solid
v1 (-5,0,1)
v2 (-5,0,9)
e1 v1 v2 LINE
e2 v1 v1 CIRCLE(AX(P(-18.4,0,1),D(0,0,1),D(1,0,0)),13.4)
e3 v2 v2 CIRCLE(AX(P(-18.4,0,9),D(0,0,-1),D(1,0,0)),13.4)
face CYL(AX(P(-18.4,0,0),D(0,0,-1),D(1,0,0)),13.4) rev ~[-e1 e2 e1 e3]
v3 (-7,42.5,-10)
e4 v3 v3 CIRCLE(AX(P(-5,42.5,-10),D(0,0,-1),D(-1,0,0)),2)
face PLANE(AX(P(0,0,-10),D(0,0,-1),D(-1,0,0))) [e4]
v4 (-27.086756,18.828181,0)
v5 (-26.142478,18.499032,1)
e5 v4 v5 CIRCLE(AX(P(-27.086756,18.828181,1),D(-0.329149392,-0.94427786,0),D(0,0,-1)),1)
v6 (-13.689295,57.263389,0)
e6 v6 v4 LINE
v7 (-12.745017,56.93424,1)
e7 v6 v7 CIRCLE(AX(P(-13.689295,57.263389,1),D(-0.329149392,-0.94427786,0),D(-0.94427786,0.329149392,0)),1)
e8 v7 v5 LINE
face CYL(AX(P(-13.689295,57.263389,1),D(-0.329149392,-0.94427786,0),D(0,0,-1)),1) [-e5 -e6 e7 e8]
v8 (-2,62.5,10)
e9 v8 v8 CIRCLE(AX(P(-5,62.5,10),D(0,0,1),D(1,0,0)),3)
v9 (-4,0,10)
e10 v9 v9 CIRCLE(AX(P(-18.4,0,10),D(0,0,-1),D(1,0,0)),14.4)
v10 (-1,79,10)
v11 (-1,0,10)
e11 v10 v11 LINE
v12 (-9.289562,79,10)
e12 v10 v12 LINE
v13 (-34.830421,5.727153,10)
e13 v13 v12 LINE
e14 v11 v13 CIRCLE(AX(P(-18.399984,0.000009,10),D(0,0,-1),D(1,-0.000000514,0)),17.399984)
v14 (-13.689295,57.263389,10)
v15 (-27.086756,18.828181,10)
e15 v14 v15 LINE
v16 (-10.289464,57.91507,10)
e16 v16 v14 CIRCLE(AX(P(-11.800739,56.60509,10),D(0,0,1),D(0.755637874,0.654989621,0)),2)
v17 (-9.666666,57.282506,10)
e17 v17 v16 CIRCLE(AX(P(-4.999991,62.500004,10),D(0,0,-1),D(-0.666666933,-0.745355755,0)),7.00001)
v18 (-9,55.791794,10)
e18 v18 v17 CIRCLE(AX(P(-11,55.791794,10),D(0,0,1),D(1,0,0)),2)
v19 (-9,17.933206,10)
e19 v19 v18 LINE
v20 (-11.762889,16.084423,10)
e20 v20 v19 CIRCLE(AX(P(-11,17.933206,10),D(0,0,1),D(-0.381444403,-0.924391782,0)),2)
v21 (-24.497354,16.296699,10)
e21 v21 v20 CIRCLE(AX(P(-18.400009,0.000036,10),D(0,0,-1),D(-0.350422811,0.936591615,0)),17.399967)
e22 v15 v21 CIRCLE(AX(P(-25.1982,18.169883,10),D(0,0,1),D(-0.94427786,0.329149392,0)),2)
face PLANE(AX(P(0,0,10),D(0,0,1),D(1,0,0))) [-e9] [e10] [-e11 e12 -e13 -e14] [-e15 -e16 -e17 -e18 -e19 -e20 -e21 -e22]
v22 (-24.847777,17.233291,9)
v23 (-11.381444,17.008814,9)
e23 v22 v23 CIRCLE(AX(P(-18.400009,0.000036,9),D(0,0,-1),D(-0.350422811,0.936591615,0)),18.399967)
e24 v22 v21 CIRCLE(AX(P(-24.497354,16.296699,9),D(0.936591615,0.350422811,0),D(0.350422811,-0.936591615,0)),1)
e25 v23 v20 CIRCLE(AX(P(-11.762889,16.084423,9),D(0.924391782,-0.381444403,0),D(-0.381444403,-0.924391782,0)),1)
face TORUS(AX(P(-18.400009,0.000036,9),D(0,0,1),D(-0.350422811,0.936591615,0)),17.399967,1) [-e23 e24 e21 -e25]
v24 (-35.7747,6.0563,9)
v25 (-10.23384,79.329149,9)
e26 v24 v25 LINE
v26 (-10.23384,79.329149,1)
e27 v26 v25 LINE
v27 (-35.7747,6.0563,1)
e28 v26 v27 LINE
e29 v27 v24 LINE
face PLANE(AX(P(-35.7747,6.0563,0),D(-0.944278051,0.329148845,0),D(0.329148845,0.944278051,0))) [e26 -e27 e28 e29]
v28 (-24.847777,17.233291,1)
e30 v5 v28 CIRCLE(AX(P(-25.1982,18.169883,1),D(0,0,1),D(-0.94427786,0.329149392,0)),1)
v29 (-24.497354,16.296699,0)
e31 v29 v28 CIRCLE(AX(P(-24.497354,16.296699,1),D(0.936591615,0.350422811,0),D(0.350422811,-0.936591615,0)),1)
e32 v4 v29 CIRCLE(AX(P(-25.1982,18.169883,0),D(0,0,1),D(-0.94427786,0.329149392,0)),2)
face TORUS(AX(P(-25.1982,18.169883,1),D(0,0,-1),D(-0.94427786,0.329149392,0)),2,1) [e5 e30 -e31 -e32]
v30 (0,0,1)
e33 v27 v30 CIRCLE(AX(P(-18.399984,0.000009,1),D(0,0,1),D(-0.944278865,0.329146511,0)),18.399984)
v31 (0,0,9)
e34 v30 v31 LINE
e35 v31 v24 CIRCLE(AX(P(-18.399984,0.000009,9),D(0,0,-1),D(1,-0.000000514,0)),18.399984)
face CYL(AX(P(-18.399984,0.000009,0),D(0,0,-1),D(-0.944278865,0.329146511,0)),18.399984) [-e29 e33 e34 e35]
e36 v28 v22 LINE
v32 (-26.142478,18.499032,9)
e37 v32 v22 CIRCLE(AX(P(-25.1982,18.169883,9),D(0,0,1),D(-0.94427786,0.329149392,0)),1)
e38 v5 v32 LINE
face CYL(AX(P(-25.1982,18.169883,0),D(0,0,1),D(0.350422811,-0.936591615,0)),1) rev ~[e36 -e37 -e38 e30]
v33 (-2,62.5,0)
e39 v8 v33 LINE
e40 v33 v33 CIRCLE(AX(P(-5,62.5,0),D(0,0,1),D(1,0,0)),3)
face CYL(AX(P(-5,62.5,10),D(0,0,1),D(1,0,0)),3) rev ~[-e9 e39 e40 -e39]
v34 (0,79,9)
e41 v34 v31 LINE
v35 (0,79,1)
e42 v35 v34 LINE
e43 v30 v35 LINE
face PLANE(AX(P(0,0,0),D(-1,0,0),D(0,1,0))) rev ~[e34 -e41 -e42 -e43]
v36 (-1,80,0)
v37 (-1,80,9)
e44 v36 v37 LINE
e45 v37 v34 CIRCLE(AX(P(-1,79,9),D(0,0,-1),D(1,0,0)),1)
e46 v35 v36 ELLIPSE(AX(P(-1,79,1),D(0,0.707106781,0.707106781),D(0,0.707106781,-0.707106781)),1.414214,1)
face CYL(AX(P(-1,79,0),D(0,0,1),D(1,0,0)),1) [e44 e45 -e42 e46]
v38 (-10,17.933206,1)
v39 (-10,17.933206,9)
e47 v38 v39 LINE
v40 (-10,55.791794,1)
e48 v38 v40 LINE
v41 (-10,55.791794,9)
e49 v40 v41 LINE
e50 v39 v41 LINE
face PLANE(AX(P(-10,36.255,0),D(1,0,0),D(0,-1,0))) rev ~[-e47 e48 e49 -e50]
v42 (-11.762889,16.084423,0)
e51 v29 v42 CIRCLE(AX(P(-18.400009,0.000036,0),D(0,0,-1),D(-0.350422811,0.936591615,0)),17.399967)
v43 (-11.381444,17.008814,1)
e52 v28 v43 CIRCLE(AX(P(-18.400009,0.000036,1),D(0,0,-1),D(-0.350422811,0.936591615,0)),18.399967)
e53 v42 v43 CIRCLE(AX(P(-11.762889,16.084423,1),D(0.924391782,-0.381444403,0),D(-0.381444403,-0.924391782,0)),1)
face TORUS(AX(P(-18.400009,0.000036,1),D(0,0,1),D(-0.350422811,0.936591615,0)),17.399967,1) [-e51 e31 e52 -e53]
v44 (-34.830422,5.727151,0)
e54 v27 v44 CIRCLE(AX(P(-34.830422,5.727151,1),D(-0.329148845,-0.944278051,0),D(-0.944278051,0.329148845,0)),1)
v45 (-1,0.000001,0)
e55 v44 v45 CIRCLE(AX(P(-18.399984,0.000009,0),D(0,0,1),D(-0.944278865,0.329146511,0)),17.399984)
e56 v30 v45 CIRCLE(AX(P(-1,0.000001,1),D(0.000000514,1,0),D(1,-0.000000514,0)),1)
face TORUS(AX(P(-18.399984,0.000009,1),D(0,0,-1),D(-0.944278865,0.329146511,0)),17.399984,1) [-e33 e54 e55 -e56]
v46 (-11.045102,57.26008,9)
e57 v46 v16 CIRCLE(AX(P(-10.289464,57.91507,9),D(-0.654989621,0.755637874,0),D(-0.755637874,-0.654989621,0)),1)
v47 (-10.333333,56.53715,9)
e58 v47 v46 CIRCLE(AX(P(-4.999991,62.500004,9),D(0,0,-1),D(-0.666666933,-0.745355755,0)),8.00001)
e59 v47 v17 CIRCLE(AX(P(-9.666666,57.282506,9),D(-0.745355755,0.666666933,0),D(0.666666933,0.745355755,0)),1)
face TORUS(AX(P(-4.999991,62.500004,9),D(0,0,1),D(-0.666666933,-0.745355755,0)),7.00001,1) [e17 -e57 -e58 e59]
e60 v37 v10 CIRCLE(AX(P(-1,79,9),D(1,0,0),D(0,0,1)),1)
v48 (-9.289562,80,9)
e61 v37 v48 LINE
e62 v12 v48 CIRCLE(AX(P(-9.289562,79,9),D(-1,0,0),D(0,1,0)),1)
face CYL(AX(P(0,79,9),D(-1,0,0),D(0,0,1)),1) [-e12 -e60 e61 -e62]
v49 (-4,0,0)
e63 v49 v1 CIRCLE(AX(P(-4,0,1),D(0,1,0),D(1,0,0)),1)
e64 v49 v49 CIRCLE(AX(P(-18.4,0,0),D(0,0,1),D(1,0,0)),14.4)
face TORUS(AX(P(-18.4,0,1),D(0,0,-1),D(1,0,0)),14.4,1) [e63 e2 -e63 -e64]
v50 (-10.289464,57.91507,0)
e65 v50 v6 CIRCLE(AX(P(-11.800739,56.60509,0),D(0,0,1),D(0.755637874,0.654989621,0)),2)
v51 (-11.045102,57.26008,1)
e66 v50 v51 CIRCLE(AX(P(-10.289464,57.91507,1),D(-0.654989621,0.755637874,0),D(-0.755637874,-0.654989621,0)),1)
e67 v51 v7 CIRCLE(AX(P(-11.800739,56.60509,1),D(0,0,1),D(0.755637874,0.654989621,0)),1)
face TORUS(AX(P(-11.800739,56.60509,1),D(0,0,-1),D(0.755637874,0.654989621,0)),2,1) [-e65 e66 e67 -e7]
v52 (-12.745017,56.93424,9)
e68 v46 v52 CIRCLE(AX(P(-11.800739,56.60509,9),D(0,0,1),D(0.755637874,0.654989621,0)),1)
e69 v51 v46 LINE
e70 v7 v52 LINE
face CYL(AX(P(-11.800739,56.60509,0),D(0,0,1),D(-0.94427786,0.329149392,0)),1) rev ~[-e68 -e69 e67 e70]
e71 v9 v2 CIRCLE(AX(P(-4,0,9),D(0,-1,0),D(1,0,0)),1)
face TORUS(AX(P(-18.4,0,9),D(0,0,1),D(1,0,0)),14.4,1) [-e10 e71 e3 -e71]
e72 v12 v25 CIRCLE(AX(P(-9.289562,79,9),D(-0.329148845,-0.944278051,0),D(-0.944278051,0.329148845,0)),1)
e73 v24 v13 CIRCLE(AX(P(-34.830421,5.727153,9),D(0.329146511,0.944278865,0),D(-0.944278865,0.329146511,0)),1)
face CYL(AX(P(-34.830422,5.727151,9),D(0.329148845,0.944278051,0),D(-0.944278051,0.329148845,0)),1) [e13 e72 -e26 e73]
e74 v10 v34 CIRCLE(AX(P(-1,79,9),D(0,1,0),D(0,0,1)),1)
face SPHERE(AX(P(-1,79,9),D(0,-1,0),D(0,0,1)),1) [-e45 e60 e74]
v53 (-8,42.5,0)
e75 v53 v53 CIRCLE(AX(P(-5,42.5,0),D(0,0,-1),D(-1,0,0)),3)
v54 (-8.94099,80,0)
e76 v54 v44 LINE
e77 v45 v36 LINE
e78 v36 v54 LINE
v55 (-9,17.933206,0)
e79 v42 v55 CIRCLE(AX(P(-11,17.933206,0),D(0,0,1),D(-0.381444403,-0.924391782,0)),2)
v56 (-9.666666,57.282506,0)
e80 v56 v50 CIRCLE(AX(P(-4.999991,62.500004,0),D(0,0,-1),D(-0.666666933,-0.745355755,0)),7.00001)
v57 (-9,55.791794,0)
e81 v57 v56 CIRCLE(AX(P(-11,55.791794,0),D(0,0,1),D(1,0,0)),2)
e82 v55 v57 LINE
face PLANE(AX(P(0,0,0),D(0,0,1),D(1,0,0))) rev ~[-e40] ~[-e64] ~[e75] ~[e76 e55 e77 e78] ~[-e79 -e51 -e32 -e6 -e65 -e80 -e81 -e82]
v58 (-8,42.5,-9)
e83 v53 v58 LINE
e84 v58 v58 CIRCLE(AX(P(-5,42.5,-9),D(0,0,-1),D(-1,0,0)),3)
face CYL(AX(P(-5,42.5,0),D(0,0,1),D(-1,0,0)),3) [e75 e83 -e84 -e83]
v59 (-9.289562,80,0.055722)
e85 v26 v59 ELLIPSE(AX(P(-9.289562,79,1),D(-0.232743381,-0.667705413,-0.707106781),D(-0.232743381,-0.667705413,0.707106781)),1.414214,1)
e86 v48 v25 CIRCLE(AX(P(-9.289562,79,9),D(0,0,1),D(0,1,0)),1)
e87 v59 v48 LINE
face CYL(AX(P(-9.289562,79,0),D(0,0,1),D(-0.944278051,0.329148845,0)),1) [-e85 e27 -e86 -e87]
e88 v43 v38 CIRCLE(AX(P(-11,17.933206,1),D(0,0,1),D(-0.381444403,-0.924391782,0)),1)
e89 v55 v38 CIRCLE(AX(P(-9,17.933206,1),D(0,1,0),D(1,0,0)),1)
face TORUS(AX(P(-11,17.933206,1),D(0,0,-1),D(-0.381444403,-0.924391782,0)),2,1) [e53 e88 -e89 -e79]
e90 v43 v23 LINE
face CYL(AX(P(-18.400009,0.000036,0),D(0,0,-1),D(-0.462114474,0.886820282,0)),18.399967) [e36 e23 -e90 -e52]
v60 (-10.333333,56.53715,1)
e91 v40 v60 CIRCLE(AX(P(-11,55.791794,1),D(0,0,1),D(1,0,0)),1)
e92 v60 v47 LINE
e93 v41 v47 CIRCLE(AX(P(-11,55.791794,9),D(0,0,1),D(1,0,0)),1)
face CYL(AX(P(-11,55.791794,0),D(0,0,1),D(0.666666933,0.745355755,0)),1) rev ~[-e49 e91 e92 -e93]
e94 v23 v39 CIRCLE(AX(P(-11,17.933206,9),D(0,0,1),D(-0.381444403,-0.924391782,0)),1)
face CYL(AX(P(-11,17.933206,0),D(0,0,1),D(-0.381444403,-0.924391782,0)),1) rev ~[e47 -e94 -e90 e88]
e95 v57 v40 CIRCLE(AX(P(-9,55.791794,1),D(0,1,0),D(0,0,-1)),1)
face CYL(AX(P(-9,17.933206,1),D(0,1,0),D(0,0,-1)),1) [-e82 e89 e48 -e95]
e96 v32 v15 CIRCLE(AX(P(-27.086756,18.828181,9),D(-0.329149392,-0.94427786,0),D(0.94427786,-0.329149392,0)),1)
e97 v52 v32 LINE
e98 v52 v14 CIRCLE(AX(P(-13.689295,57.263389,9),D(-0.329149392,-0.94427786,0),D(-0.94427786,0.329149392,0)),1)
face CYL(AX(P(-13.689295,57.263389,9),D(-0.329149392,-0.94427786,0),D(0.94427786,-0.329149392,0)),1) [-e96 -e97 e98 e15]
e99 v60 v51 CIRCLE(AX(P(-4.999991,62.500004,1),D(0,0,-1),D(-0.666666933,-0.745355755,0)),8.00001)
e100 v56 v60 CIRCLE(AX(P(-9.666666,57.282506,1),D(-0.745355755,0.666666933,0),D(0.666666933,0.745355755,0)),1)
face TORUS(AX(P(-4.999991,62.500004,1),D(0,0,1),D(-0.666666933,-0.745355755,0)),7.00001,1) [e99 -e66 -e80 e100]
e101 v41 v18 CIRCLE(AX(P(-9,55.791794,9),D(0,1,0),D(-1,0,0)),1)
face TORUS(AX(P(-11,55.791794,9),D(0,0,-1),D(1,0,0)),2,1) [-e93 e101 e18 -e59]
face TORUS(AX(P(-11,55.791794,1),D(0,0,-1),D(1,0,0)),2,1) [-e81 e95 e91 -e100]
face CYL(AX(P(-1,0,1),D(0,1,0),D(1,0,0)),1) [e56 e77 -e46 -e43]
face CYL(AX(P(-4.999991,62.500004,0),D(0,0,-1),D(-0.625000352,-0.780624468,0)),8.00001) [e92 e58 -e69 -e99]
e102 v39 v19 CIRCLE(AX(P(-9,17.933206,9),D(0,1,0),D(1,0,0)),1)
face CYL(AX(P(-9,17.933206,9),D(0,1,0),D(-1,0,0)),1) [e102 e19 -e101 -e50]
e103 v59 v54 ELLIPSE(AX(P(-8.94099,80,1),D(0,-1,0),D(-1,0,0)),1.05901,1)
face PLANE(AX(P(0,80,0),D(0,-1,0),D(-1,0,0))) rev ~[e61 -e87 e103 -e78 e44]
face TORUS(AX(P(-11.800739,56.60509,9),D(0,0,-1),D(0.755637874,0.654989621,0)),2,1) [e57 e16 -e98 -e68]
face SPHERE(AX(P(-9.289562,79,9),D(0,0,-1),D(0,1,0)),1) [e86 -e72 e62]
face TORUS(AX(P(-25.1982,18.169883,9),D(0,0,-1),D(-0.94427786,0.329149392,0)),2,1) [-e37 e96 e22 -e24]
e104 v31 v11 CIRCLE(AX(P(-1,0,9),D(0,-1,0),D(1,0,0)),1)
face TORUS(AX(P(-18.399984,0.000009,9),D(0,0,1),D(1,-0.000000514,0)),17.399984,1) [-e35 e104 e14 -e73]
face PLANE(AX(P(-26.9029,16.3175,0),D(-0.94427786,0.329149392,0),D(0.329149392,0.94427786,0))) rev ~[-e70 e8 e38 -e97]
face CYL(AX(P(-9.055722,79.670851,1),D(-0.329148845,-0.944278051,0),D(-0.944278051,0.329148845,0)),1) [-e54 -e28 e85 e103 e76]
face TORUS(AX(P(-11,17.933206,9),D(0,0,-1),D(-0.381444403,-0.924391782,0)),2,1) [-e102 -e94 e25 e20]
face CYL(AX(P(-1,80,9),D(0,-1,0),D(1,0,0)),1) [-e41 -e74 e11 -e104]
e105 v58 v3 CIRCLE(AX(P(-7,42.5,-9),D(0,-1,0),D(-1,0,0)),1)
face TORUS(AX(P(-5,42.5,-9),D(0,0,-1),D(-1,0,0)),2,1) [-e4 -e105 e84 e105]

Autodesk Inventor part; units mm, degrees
ref_plane "YZ Plane" through (0, 0, 0) normal (1, 0, 0) x (0, 1, 0)
ref_plane "XZ Plane" through (0, 0, 0) normal (0, 1, 0) x (-1, 0, 0)
ref_plane "XY Plane" through (0, 0, 0) normal (0, 0, 1) x (1, 0, 0)
sketch "Sketch1" plane through (0, 0, 0) normal (0, 0, 1) x (1, 0, 0)
  circle A0 centre (-18.4, 0) radius 13.4
  arc A1 (-35.7747, 6.0563) -> (0, 0) centre (-18.4, 0) ccw
  line L0 (-35.7747, 6.0563) -> (-10, 80)
  line L1 (0, 0) -> (0, 80)
  line L2 (0, 80) -> (-10, 80)
  line L3 (0, -41.4558) -> (0, 100.2426) projected
  line L4 (-47.5867, 0) -> (8.228, 0) projected
  dimension "d0" = 26.8
  dimension "d1" = 5
  dimension "d2" = 80
  dimension "d8" = 10
extrude "Extrusion1" add sketch "Sketch1" along normal blind 10 contours L4 A1 A0 | A0 L4 A1 L0 L2 L1
sketch "Sketch4" plane through (0, 0, 10) normal (0, 0, 1) x (1, 0, 0)
  circle A0 centre (-5, 62.5) radius 3
  circle A1 centre (-5, 42.5) radius 3
  line L0 (-5, 42.5) -> (-5, 80) construction
  line L1 (0, 80) -> (-10, 80) projected
  line L2 (0, 0) -> (0, 80) projected
  dimension "d23" = 6
  dimension "d24" = 6
  dimension "d25" = 17.5
  dimension "d26" = 20
extrude "Extrusion5" cut sketch "Sketch4" against normal up to surface (10 mm away) contours A0
sketch "Sketch5" plane through (0, 0, 0) normal (0, 0, -1) x (-1, 0, 0)
  circle A0 centre (5, 42.5) radius 3 projected
  point P0 (0, 0)
extrude "Extrusion7" add sketch "Sketch5" along normal blind 10
sketch "Sketch6" plane through (0, 0, 0) normal (0, 0, -1) x (-1, 0, 0)
  arc A0 (26.9029, 16.3175) -> (10, 16.3707) centre (18.4, 0) ccw
  line L0 (10, 36.255) -> (10, 16.3707)
  line L1 (0, 0) -> (0, 80) projected
  circle A1 centre (5, 42.5) radius 3 projected
  circle A2 centre (18.4, 0) radius 13.4 projected
  line L2 (10, 80) -> (35.7747, 6.0563) projected
  line L3 (0, 0) -> (0, 80) projected
  line L4 (10, 36.255) -> (10, 56.255)
  line L5 (26.9029, 16.3175) -> (8.2581, 69.8065)
  arc A3 (10, 56.255) -> (8.2581, 69.8065) centre (5, 62.5) ccw
  circle A4 centre (5, 62.5) radius 3 projected
  point P0 (12.094, 58.802)
  dimension "d36" = 5
  dimension "d40" = 10
  dimension "d43" = 5
  dimension "d44" = 5
extrude "Extrusion8" cut sketch "Sketch6" against normal up to surface (10 mm away) contours A0 L0 L4 A3 L5
fillet "Fillet1" radius 1 12 edges at (-21.4713, -18.1419, 10) (0, 40, 10) (-22.8874, 43.0282, 10) (-21.4713, -18.1419, 0) (0, 40, 0) (-22.8874, 43.0282, 0) (-2, 42.5, -10) (-31.8, 0, 10) (-31.8, 0, 0) (-10, 80, 5) (-5, 80, 10) (0, 80, 5)
fillet "Fillet2" radius 1 4 edges at (-12.094, 58.802, 5) (-10, 56.255, 5) (-10, 16.3707, 5) (-26.9029, 16.3175, 5)
fillet "Fillet3" radius 1 16 edges at (-10.4439, 17.1021, 10) (-18.0933, 18.3974, 10) (-25.8973, 17.4548, 10) (-19.4438, 37.7166, 10) (-11.989, 57.5872, 10) (-10.7007, 56.8873, 10) (-10.0871, 56.2, 10) (-10, 36.8625, 10) (-10.4439, 17.1021, 0) (-10, 36.8625, 0) (-10.0871, 56.2, 0) (-18.0933, 18.3974, 0) (-10.7007, 56.8873, 0) (-25.8973, 17.4548, 0) (-11.989, 57.5872, 0) (-19.4438, 37.7166, 0)
properties part number "Pedal Support R"
